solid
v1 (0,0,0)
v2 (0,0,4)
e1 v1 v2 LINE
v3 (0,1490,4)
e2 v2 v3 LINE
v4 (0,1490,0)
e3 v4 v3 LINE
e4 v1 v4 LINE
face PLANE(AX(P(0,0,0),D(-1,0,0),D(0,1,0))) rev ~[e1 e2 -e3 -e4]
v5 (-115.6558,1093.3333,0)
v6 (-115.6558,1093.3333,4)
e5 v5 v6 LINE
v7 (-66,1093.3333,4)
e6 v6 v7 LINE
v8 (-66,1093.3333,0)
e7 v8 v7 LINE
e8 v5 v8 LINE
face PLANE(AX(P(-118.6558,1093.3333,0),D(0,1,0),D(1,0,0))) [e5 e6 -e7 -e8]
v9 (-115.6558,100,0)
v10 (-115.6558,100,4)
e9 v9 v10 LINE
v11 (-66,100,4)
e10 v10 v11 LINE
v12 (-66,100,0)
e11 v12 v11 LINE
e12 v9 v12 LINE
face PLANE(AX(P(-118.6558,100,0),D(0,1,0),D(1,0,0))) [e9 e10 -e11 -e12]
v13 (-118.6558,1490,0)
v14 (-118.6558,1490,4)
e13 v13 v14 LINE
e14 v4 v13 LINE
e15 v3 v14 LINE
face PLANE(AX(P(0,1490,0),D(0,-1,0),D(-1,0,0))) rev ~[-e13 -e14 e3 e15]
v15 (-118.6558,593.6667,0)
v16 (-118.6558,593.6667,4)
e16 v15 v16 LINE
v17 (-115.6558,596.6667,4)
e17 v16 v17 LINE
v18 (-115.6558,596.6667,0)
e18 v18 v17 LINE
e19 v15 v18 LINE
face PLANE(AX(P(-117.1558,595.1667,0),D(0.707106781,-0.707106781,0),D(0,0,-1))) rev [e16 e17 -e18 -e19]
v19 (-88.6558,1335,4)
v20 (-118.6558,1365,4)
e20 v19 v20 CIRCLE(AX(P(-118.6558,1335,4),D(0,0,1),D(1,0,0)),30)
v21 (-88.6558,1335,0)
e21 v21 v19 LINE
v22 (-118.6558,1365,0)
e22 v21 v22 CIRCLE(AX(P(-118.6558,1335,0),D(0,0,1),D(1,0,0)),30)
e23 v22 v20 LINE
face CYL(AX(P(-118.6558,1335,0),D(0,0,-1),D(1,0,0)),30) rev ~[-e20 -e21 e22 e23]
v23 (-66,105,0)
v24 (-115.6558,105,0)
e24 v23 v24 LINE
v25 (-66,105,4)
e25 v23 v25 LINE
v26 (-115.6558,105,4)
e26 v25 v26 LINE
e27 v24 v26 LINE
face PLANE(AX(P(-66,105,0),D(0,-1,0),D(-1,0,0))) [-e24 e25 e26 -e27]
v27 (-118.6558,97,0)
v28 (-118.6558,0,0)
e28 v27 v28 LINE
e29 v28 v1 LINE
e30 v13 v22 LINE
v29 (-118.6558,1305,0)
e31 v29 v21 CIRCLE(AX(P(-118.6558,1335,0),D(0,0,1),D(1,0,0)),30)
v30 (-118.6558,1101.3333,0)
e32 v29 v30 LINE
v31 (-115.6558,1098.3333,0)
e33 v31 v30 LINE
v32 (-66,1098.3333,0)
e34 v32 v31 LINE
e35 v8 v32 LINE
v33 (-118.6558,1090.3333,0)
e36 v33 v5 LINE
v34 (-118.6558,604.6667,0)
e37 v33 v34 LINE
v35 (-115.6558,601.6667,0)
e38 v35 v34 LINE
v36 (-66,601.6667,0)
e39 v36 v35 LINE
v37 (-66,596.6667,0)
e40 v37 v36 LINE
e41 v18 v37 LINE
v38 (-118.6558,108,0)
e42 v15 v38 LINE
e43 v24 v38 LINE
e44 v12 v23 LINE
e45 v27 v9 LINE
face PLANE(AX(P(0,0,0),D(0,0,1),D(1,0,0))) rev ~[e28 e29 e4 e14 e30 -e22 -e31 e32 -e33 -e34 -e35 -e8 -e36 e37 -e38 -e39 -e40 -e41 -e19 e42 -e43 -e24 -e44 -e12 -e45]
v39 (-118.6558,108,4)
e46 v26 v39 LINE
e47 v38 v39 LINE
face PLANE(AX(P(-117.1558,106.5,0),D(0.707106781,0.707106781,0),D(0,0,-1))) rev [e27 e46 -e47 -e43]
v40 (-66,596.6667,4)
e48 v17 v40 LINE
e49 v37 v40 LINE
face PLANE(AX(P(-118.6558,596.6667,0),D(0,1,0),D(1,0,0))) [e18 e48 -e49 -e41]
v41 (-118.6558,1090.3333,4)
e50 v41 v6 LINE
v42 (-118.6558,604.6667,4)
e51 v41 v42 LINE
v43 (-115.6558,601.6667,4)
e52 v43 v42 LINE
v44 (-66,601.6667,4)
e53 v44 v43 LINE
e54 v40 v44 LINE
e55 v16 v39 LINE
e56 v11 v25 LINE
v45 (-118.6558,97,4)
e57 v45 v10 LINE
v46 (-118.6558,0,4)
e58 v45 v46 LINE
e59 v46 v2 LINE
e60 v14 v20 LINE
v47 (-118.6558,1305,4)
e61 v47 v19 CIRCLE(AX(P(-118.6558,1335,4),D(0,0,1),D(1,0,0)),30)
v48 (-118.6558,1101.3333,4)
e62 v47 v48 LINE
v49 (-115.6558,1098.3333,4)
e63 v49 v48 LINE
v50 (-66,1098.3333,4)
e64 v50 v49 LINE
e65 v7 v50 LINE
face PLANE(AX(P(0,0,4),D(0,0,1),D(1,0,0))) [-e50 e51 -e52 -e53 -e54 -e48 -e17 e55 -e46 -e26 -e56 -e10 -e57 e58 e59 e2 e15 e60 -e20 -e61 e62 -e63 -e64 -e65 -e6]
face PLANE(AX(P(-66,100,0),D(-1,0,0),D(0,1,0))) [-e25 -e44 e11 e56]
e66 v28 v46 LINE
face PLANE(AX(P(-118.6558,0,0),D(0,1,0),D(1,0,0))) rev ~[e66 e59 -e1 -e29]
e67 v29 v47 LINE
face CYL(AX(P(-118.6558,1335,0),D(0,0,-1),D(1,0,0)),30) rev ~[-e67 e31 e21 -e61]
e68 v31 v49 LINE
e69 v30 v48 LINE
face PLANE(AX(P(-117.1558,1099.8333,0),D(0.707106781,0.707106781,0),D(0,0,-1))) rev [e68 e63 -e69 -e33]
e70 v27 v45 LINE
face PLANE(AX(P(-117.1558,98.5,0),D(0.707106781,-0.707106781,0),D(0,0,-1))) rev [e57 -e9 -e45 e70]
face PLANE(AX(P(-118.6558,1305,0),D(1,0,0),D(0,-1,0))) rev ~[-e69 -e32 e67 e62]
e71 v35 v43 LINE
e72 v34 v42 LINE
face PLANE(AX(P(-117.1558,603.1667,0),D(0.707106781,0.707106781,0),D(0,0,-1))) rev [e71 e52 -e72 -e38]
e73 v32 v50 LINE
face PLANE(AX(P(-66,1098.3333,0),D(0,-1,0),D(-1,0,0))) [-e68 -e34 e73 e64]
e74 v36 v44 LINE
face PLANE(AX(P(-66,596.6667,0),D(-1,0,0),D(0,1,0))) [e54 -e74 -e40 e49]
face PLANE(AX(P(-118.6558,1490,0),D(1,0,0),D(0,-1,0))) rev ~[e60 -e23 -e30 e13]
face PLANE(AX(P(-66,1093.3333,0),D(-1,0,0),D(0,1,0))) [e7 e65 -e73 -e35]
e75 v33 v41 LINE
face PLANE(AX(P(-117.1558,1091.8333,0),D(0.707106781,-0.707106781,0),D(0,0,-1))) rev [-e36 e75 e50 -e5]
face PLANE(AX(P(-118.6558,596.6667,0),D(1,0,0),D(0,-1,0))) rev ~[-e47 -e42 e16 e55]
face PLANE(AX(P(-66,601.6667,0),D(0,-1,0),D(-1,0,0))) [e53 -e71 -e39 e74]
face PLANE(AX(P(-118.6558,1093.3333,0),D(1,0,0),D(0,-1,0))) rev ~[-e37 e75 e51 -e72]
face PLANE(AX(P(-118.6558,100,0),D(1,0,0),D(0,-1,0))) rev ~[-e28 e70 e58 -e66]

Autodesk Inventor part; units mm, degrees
ref_plane "YZ Plane" through (0, 0, 0) normal (1, 0, 0) x (0, 1, 0)
ref_plane "XZ Plane" through (0, 0, 0) normal (0, 1, 0) x (-1, 0, 0)
ref_plane "XY Plane" through (0, 0, 0) normal (0, 0, 1) x (1, 0, 0)
sketch "Sketch1" plane through (0, 0, 0) normal (0, 0, 1) x (1, 0, 0)
  line L0 (0, 1490) -> (-118.6558, 1490)
  line L1 (-118.6558, 1490) -> (-118.6558, 0)
  line L2 (-118.6558, 0) -> (0, 0)
  line L3 (0, 0) -> (0, 1490)
  line L4 (-118.6558, 100) -> (-66, 100)
  line L5 (-66, 100) -> (-66, 105)
  line L6 (-66, 105) -> (-118.6558, 105)
  line L7 (-118.6558, 105) -> (-118.6558, 100)
  line L8 (-118.6558, 596.6667) -> (-66, 596.6667)
  line L9 (-66, 596.6667) -> (-66, 601.6667)
  line L10 (-66, 601.6667) -> (-118.6558, 601.6667)
  line L11 (-118.6558, 601.6667) -> (-118.6558, 596.6667)
  line L12 (-118.6558, 1093.3333) -> (-66, 1093.3333)
  line L13 (-66, 1093.3333) -> (-66, 1098.3333)
  line L14 (-66, 1098.3333) -> (-118.6558, 1098.3333)
  line L15 (-118.6558, 1098.3333) -> (-118.6558, 1093.3333)
  circle A0 centre (-118.6558, 1335) radius 30
  point P0 (-118.6558, 1098.3333)
  point P1 (-118.6558, 1093.3333)
  point P2 (-118.6558, 601.6667)
  point P3 (-118.6558, 1365)
  point P4 (-118.6558, 1305)
  dimension "d0" = 1490
  dimension "d1" = 118.6559
  dimension "d2" = 5
  dimension "d4" = 100
  dimension "d7" = 496.6667
  dimension "d23" = 66
  dimension "d29" = 60
  dimension "d30" = 1335
extrude "Plate1" add sketch "Sketch1" along normal blind 4 contours L3 L2 L1 L4 L5 L6 L8 L9 L10 L12 L13 L14 A0 L0
chamfer "Corner Chamfer1" distance 3 angle 45 6 edges at (-118.6558, 100, 2) (-118.6558, 105, 2) (-118.6558, 596.6667, 2) (-118.6558, 601.6667, 2) (-118.6558, 1098.3333, 2) (-118.6558, 1093.3333, 2)
equation "\"d0\" = Стрингер_длина"
equation "\"d1\" = стрингер_глубина_7"
equation "\"d2\" = паз_под_стрингер_толщина"
equation "\"d7\" = Шаг_шпангоутов"
equation "\"d23\" = паз_под_стрингер_глубина - Thickness"
equation "\"d29\" = 2 * радиус_выреза_под_сварку"
equation "\"d12\" = Thickness"
equation "\"BendRadius\" = Thickness"
equation "\"BendReliefWidth\" = Thickness"
equation "\"BendReliefDepth\" = 0.5 * Thickness"
equation "\"CornerReliefSize\" = 4 * Thickness"
equation "\"MinimumRemnant\" = 2 * Thickness"
equation "\"TransitionRadius\" = BendRadius"
equation "\"JacobiRadiusSize\" = BendRadius"
equation "\"GapSize\" = Thickness"
equation "\"Стрингер_длина\" = 1490"
equation "\"стрингер_глубина_7\" = 118.65585"
equation "\"паз_под_стрингер_толщина\" = 5"
equation "\"Шаг_шпангоутов\" = 496.666667"
equation "\"паз_под_стрингер_глубина\" = 70"
equation "\"Thickness\" = 4"
equation "\"радиус_выреза_под_сварку\" = 30"
properties part number "GBK 3302 stringer 7" material "Steel"
